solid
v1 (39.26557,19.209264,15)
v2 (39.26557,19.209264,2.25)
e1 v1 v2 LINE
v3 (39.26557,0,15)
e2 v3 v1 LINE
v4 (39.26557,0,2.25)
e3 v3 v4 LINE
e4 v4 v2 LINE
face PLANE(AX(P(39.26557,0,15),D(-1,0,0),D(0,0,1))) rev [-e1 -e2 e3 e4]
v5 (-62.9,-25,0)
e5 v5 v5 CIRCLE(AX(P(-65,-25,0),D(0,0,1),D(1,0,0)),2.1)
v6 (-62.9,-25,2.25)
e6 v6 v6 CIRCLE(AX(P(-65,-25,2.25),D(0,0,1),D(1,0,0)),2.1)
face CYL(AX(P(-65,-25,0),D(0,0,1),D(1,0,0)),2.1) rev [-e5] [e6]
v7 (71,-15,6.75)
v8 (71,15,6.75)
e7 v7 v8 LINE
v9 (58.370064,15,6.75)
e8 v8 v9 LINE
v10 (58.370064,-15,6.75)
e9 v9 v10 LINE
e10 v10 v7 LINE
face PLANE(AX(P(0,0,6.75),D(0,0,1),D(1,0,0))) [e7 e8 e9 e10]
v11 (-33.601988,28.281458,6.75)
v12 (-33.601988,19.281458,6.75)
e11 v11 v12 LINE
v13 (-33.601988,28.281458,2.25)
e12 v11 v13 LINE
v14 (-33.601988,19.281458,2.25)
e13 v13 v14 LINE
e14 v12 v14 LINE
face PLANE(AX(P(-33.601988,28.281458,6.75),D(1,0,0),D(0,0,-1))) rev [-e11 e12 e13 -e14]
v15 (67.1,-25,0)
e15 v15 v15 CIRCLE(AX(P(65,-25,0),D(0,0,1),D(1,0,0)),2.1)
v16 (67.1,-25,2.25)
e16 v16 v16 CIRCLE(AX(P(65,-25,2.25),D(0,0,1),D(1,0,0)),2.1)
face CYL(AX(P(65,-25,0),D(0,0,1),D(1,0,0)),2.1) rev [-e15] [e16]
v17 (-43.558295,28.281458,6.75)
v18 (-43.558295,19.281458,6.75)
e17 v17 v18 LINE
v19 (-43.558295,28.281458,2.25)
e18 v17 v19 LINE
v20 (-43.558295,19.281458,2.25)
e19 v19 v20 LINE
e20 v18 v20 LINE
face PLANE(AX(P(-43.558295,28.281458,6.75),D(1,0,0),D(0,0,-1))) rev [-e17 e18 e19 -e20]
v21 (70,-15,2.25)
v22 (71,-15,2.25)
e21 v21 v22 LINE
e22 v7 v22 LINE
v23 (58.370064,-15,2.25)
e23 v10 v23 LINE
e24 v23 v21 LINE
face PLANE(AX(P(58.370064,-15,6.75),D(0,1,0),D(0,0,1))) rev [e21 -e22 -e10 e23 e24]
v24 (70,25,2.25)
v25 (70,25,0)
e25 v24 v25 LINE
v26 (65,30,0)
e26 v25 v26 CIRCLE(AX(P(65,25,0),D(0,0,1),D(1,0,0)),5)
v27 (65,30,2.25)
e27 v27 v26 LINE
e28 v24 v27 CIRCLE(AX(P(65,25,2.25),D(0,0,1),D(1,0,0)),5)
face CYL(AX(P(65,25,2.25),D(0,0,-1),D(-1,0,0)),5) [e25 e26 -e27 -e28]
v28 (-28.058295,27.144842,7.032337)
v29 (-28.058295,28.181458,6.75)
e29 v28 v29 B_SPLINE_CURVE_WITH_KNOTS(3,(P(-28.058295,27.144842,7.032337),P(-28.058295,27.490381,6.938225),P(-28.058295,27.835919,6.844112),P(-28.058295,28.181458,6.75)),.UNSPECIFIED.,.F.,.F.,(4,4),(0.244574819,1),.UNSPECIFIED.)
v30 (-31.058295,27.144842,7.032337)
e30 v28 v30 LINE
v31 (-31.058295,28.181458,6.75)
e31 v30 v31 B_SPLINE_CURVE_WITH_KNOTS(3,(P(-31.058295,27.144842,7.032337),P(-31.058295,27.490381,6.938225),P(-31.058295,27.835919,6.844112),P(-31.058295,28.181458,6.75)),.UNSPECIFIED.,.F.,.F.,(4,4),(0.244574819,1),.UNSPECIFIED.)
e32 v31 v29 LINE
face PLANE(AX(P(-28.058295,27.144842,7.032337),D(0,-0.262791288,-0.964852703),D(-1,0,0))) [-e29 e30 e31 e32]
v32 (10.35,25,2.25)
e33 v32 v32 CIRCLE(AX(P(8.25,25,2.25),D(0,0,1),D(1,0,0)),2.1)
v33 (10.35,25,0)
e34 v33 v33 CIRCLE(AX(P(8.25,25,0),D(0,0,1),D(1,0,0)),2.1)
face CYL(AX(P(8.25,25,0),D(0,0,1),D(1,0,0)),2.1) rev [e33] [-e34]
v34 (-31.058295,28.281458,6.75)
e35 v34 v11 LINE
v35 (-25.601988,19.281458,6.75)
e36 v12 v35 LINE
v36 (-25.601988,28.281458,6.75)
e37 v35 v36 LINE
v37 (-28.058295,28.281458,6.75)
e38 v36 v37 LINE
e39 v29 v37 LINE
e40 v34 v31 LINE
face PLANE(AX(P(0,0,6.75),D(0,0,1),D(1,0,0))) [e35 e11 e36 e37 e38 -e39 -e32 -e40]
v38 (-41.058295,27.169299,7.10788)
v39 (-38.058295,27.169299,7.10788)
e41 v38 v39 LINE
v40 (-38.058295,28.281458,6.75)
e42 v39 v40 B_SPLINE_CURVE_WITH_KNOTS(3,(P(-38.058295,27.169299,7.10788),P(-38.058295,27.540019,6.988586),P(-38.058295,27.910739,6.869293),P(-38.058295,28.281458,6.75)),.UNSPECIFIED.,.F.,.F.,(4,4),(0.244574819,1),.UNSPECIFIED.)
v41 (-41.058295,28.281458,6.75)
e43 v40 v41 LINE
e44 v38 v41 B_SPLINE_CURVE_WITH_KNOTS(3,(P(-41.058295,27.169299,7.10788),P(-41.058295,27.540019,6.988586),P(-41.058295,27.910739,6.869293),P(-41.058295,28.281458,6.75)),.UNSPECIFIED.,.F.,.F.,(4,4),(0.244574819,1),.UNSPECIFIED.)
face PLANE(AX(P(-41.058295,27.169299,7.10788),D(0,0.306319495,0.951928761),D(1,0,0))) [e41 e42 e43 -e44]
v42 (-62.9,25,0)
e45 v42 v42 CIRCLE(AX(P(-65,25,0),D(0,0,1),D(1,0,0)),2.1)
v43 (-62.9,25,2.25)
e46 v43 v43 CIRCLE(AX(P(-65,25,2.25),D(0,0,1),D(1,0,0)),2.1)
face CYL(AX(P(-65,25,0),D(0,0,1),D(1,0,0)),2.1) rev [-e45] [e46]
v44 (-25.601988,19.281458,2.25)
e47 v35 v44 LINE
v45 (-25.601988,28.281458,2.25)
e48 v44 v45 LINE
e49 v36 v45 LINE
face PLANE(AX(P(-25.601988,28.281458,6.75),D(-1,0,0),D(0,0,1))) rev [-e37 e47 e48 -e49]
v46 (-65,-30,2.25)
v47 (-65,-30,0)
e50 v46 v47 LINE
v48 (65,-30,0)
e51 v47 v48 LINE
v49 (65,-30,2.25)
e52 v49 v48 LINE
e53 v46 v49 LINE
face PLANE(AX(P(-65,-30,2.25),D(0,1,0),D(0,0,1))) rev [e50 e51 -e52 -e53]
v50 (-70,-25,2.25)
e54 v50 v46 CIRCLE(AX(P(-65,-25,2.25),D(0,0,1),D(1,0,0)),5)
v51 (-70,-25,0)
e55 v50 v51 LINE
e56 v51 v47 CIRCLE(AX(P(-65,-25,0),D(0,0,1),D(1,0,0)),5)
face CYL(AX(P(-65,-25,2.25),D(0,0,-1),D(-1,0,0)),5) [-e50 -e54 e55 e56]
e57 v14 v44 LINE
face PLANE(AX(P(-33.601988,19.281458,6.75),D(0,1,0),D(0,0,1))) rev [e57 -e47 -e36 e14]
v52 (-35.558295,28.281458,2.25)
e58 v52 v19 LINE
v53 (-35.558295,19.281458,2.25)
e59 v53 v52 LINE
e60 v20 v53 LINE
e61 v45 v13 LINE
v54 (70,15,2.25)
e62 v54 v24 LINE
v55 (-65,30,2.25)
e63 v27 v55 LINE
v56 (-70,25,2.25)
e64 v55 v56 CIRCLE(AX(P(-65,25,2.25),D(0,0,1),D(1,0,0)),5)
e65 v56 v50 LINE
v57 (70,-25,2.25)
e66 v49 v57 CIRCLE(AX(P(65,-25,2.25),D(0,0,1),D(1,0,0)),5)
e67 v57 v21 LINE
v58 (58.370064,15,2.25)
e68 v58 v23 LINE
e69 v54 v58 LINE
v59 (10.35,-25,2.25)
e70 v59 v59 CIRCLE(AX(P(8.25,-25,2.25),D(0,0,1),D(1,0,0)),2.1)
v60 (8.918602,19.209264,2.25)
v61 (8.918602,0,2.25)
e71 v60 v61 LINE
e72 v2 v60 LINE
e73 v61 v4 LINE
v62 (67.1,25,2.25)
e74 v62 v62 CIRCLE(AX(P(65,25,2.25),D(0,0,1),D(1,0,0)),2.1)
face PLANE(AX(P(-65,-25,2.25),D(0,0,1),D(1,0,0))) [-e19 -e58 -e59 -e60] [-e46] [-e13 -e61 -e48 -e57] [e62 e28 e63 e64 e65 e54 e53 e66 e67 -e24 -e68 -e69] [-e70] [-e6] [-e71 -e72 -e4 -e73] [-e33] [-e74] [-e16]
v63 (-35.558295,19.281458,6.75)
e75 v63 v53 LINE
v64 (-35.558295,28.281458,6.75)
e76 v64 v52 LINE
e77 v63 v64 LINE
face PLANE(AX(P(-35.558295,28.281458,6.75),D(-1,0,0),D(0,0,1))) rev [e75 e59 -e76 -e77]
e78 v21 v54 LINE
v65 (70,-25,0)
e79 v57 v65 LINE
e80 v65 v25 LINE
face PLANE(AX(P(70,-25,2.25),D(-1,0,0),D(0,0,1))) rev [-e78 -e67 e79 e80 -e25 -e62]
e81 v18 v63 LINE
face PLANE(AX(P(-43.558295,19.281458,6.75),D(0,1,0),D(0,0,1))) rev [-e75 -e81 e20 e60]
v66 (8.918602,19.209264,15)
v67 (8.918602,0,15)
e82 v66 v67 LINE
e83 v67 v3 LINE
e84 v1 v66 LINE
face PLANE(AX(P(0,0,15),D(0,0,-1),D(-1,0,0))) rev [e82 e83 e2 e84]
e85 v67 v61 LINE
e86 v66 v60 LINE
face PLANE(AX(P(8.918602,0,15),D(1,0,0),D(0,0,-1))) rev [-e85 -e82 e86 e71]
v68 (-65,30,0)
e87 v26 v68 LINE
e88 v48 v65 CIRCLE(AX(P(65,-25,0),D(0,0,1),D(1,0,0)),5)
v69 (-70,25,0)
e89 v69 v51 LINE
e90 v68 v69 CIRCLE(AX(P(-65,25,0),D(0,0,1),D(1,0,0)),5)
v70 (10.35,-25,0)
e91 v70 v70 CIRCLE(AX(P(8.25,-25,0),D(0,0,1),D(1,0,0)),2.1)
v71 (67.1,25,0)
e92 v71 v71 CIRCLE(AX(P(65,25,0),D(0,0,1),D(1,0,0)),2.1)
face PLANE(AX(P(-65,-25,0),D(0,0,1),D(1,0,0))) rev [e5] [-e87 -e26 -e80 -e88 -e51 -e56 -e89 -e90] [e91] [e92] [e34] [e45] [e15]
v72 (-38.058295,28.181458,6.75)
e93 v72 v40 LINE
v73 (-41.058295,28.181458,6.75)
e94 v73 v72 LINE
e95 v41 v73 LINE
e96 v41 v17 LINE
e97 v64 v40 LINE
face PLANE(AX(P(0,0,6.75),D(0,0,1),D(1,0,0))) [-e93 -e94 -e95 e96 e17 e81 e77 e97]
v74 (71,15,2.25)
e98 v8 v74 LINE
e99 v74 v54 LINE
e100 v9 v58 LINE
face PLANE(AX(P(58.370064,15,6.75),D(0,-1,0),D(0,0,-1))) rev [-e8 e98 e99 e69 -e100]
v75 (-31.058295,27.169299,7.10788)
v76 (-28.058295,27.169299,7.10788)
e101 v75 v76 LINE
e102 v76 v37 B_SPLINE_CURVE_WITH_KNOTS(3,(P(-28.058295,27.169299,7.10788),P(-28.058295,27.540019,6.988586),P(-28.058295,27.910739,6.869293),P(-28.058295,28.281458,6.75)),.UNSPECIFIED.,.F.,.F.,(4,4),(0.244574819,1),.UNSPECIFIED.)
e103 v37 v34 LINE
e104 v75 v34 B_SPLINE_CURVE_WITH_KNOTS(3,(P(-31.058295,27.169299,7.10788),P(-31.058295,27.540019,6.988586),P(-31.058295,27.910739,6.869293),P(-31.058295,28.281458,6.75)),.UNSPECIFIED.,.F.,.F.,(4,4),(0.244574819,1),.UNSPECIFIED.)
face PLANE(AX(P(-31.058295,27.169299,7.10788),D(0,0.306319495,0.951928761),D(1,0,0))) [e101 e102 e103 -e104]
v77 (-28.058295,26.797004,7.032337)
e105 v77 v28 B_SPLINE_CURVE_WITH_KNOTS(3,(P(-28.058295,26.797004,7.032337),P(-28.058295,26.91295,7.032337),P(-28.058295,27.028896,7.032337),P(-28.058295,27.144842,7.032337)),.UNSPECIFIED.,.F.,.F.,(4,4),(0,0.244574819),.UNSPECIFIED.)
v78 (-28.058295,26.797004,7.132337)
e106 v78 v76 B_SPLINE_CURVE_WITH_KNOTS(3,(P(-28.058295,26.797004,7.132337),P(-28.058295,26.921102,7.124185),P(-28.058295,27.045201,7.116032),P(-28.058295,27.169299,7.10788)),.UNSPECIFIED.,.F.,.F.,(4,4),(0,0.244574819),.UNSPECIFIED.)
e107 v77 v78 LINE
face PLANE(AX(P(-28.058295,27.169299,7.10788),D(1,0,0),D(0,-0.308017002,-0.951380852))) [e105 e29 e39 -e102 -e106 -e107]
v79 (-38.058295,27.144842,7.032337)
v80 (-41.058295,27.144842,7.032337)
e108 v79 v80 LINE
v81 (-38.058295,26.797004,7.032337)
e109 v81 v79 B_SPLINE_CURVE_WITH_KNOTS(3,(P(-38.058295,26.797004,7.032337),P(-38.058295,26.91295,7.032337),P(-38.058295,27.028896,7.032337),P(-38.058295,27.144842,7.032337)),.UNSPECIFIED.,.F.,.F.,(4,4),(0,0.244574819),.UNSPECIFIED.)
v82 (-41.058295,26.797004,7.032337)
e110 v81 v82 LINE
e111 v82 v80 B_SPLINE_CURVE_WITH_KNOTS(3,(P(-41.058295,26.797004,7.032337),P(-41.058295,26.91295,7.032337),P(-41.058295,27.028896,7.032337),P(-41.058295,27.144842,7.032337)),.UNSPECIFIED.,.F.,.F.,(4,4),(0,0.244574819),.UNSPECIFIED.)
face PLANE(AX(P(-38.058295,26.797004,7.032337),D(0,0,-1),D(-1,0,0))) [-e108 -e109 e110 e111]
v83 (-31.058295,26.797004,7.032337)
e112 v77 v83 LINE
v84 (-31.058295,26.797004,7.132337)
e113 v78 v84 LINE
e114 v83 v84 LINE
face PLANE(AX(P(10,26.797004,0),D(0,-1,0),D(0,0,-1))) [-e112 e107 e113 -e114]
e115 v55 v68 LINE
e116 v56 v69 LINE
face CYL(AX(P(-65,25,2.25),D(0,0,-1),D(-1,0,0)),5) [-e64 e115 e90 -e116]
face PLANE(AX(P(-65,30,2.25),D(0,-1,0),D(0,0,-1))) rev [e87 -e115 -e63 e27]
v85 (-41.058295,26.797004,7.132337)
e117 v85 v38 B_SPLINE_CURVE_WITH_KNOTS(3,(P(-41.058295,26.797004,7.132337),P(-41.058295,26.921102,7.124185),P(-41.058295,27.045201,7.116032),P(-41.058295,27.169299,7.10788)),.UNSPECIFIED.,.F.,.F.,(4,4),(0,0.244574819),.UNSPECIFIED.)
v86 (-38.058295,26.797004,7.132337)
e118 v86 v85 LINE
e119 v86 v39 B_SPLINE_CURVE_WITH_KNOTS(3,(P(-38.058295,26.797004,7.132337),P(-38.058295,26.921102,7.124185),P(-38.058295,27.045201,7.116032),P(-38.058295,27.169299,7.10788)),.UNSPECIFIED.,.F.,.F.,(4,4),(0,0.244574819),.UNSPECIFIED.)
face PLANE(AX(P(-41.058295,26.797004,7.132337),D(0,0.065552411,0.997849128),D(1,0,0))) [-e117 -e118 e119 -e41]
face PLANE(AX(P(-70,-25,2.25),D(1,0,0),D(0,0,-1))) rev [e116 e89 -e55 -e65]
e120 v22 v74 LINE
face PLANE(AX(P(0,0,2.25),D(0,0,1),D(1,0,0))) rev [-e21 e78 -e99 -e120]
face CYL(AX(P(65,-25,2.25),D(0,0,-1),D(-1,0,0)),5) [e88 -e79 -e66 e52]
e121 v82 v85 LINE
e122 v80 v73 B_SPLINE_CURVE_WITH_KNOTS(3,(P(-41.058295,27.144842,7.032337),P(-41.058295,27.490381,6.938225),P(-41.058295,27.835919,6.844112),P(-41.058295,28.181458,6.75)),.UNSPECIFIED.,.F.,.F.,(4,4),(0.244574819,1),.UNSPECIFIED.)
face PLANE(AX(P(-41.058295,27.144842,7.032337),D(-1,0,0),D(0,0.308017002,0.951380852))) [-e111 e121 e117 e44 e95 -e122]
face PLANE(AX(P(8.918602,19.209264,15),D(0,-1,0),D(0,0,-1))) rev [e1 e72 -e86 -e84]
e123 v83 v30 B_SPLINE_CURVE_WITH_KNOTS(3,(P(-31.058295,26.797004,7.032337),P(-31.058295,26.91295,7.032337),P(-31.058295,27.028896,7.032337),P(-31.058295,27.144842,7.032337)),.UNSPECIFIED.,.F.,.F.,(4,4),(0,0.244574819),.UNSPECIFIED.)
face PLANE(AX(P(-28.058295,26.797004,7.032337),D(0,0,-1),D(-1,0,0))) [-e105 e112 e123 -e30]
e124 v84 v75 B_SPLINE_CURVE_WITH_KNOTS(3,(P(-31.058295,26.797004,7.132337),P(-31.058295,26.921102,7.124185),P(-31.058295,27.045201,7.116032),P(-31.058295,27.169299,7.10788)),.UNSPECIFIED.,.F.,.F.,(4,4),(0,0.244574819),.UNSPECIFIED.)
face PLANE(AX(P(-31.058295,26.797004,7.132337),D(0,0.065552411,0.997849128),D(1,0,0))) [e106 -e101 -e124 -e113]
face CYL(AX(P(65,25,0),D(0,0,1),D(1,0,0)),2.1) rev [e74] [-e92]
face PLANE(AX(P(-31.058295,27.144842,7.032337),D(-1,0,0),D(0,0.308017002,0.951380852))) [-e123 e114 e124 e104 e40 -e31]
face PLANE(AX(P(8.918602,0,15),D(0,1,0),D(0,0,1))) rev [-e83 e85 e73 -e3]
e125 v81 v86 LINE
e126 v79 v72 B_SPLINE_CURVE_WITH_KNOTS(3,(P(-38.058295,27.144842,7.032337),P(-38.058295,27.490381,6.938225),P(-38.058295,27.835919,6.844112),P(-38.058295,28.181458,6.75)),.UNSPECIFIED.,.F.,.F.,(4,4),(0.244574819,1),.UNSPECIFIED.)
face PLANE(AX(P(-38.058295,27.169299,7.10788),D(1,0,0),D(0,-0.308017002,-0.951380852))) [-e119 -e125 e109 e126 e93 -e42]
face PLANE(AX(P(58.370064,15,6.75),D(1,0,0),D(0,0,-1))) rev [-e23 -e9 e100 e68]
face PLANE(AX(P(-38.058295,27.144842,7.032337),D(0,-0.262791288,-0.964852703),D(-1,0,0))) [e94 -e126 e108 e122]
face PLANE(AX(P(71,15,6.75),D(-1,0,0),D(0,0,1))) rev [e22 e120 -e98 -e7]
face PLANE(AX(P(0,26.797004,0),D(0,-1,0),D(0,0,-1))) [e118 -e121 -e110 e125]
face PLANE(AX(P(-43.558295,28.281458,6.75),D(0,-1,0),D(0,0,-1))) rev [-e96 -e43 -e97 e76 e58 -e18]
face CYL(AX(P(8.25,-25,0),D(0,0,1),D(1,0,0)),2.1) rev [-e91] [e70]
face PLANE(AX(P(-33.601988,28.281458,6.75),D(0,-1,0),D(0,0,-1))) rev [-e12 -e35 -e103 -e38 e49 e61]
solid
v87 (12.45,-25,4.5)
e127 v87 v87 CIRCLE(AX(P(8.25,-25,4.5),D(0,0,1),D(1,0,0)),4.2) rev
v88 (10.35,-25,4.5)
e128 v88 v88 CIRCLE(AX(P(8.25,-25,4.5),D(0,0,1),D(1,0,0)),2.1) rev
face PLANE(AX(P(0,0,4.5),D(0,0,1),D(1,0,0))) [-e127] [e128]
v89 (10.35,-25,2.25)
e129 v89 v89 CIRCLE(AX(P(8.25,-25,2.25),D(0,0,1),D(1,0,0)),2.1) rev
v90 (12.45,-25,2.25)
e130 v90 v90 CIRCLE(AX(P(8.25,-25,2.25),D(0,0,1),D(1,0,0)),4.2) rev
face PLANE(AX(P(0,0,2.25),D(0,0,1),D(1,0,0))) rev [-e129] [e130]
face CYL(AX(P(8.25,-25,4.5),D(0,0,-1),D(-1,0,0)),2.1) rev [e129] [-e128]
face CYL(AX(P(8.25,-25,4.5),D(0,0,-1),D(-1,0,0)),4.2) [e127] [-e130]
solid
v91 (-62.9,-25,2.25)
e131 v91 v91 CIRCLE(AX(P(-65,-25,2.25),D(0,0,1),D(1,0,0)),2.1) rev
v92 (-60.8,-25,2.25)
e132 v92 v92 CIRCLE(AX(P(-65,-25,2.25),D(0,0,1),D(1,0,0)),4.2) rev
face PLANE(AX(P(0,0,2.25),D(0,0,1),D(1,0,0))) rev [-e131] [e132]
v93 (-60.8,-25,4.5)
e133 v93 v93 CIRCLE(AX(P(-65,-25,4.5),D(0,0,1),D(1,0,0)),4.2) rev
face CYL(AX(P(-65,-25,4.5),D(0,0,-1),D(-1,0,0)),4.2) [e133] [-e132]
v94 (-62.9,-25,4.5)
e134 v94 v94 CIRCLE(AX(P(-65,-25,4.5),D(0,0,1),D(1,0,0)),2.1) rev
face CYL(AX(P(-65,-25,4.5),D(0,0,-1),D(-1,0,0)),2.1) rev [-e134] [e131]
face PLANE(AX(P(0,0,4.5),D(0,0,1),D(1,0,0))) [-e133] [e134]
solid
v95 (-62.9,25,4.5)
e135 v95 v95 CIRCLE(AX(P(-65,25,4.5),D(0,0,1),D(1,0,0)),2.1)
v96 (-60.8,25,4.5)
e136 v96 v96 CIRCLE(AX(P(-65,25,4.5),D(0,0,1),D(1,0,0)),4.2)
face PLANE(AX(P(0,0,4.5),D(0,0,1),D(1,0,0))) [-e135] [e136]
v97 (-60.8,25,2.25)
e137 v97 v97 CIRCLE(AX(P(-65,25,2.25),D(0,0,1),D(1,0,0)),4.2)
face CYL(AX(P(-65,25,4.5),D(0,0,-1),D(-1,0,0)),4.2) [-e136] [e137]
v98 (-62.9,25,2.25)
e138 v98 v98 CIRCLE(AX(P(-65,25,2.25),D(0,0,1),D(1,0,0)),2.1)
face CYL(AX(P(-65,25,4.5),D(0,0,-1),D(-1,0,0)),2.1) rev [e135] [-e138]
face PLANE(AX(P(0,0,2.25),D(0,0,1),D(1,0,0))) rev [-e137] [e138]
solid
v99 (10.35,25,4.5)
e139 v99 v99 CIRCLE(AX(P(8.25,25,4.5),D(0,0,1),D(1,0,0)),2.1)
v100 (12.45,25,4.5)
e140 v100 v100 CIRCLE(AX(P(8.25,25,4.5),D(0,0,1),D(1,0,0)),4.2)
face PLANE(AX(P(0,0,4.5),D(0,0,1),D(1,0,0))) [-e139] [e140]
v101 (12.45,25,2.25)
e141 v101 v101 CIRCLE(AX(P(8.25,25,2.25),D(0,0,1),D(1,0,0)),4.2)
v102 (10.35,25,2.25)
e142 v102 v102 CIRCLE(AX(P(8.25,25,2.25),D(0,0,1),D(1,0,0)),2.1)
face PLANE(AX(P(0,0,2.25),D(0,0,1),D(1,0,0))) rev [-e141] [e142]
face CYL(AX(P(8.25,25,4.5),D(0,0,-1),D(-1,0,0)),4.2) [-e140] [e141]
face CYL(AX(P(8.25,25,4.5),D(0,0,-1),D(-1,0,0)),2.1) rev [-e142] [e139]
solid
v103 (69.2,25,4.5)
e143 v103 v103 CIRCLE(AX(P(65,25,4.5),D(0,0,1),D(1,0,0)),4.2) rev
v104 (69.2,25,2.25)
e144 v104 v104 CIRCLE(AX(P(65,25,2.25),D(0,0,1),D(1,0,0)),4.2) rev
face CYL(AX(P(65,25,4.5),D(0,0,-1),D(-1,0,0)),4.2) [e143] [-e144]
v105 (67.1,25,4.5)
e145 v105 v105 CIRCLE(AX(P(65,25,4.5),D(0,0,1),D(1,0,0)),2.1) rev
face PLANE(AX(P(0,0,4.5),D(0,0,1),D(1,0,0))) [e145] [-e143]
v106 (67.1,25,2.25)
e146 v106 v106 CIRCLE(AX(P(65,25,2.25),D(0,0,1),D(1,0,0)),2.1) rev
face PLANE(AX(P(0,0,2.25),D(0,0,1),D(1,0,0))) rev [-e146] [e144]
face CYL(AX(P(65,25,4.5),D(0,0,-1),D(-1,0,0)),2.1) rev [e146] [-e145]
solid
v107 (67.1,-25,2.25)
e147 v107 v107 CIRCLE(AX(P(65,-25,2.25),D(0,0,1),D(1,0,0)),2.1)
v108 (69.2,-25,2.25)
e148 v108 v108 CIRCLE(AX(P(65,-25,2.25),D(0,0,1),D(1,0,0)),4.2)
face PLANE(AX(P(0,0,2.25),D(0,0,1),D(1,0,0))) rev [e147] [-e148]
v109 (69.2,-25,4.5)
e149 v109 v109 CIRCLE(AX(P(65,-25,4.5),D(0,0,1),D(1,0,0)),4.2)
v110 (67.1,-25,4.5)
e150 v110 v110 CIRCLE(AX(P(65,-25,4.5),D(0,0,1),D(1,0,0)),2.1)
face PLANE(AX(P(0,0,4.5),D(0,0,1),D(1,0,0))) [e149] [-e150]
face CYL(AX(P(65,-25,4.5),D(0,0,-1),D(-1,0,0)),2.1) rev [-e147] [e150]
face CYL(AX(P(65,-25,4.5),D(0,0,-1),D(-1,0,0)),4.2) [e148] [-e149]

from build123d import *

# Parameters (mm, degrees)
BOSS_EXTRUDE1_DEPTH   = 2.25
SKETCH2_R             = 4.2
SKETCH2_R_2           = 2.1
BOSS_EXTRUDE2_DEPTH   = 2.25
BOSS_EXTRUDE2_2_DEPTH = 2.25
BOSS_EXTRUDE2_3_DEPTH = 2.25
BOSS_EXTRUDE2_4_DEPTH = 2.25
BOSS_EXTRUDE2_5_DEPTH = 2.25
BOSS_EXTRUDE2_6_DEPTH = 2.25
SKETCH4_R             = 2.1
CUT_EXTRUDE2_DEPTH    = 2.25
SKETCH5_W             = 8
SKETCH5_H             = 9
BOSS_EXTRUDE3_DEPTH   = 4.5
LOFT1_START           = -41.058294719
LOFT1_DEPTH           = 3
LPATTERN1_COUNT       = 2
LPATTERN1_PITCH       = 10
SKETCH7_W             = 30.346967849
SKETCH7_H             = 19.209264207
BOSS_EXTRUDE4_DEPTH   = 12.75
SKETCH8_W             = 12.629936129
SKETCH8_H             = 30
BOSS_EXTRUDE5_DEPTH   = 4.5


# Read off the part's stored shape, not the designer's step: Loft1
with BuildPart() as part:
    # Sketch1 → Boss-Extrude1 (new body)
    with BuildSketch(Plane.XY):
        with BuildLine():
            Line((-65, -30), (65, -30))
            ThreePointArc((65, -30), (68.535533906, -28.535533906), (70, -25))
            Line((70, -25), (70, 25))
            ThreePointArc((70, 25), (68.535533906, 28.535533906), (65, 30))
            Line((65, 30), (-65, 30))
            ThreePointArc((-65, 30), (-68.535533906, 28.535533906), (-70, 25))
            Line((-70, 25), (-70, -25))
            ThreePointArc((-70, -25), (-68.535533906, -28.535533906), (-65, -30))
        make_face()
    extrude(amount=BOSS_EXTRUDE1_DEPTH)

    # Sketch4 → Cut-Extrude2 (cut)
    with BuildSketch(Plane.XY.offset(2.25)):
        with Locations((-65, 25)):
            Circle(SKETCH4_R)
        with Locations((65, 25)):
            Circle(SKETCH4_R)
        with Locations((65, -25)):
            Circle(SKETCH4_R)
        with Locations((-65, -25)):
            Circle(SKETCH4_R)
        with Locations((8.25, 25)):
            Circle(SKETCH4_R)
        with Locations((8.25, -25)):
            Circle(SKETCH4_R)
    extrude(amount=-CUT_EXTRUDE2_DEPTH, mode=Mode.SUBTRACT)

    # Sketch5 → Boss-Extrude3 (add)
    with BuildSketch(Plane.XY.offset(2.25)):
        with Locations((-39.558294718, 23.781458124)):
            Rectangle(SKETCH5_W, SKETCH5_H)
        with Locations((-29.601987553, 23.781458124)):
            Rectangle(SKETCH5_W, SKETCH5_H)
    extrude(amount=BOSS_EXTRUDE3_DEPTH)

    # Loft1 outline → Loft1 (add)
    with BuildSketch(Plane.YZ.offset(LOFT1_START)):
        Polygon((27.16929948, 7.10787959), (26.797003838, 7.132337071), (26.797003838, 7.032337071), (27.144841998, 7.032337071), (28.181458123, 6.75), (28.281458123, 6.75), align=None)
    loft1 = extrude(amount=LOFT1_DEPTH)

    # LPattern1: Loft1 ×2
    with Locations(*[(i * LPATTERN1_PITCH, 0, 0) for i in range(1, LPATTERN1_COUNT)]):
        add(loft1)

    # Sketch7 → Boss-Extrude4 (add)
    with BuildSketch(Plane.XY.offset(2.25)):
        with Locations((24.092085971, 9.604632104)):
            Rectangle(SKETCH7_W, SKETCH7_H)
    extrude(amount=BOSS_EXTRUDE4_DEPTH)

    # Sketch8 → Boss-Extrude5 (add)
    with BuildSketch(Plane.XY.offset(2.25)):
        with Locations((64.685031936, 0)):
            Rectangle(SKETCH8_W, SKETCH8_H)
    extrude(amount=BOSS_EXTRUDE5_DEPTH)


with BuildPart() as body_2:
    # Sketch2 → Boss-Extrude2 (new body)
    with BuildSketch(Plane.XY.offset(2.25)):
        with Locations((-65, 25)):
            Circle(SKETCH2_R)
        with Locations((-65, 25)):
            Circle(SKETCH2_R_2, mode=Mode.SUBTRACT)
    extrude(amount=BOSS_EXTRUDE2_DEPTH)


with BuildPart() as body_3:
    # Sketch2 → Boss-Extrude2 2 (new body)
    with BuildSketch(Plane.XY.offset(2.25)):
        with Locations((65, 25)):
            Circle(SKETCH2_R)
        with Locations((65, 25)):
            Circle(SKETCH2_R_2, mode=Mode.SUBTRACT)
    extrude(amount=BOSS_EXTRUDE2_2_DEPTH)


with BuildPart() as body_4:
    # Sketch2 → Boss-Extrude2 3 (new body)
    with BuildSketch(Plane.XY.offset(2.25)):
        with Locations((65, -25)):
            Circle(SKETCH2_R)
        with Locations((65, -25)):
            Circle(SKETCH2_R_2, mode=Mode.SUBTRACT)
    extrude(amount=BOSS_EXTRUDE2_3_DEPTH)


with BuildPart() as body_5:
    # Sketch2 → Boss-Extrude2 4 (new body)
    with BuildSketch(Plane.XY.offset(2.25)):
        with Locations((-65, -25)):
            Circle(SKETCH2_R)
        with Locations((-65, -25)):
            Circle(SKETCH2_R_2, mode=Mode.SUBTRACT)
    extrude(amount=BOSS_EXTRUDE2_4_DEPTH)


with BuildPart() as body_6:
    # Sketch2 → Boss-Extrude2 5 (new body)
    with BuildSketch(Plane.XY.offset(2.25)):
        with Locations((8.25, 25)):
            Circle(SKETCH2_R)
        with Locations((8.25, 25)):
            Circle(SKETCH2_R_2, mode=Mode.SUBTRACT)
    extrude(amount=BOSS_EXTRUDE2_5_DEPTH)


with BuildPart() as body_7:
    # Sketch2 → Boss-Extrude2 6 (new body)
    with BuildSketch(Plane.XY.offset(2.25)):
        with Locations((8.25, -25)):
            Circle(SKETCH2_R)
        with Locations((8.25, -25)):
            Circle(SKETCH2_R_2, mode=Mode.SUBTRACT)
    extrude(amount=BOSS_EXTRUDE2_6_DEPTH)


solid = Compound([part.part, body_2.part, body_3.part, body_4.part, body_5.part, body_6.part, body_7.part])
